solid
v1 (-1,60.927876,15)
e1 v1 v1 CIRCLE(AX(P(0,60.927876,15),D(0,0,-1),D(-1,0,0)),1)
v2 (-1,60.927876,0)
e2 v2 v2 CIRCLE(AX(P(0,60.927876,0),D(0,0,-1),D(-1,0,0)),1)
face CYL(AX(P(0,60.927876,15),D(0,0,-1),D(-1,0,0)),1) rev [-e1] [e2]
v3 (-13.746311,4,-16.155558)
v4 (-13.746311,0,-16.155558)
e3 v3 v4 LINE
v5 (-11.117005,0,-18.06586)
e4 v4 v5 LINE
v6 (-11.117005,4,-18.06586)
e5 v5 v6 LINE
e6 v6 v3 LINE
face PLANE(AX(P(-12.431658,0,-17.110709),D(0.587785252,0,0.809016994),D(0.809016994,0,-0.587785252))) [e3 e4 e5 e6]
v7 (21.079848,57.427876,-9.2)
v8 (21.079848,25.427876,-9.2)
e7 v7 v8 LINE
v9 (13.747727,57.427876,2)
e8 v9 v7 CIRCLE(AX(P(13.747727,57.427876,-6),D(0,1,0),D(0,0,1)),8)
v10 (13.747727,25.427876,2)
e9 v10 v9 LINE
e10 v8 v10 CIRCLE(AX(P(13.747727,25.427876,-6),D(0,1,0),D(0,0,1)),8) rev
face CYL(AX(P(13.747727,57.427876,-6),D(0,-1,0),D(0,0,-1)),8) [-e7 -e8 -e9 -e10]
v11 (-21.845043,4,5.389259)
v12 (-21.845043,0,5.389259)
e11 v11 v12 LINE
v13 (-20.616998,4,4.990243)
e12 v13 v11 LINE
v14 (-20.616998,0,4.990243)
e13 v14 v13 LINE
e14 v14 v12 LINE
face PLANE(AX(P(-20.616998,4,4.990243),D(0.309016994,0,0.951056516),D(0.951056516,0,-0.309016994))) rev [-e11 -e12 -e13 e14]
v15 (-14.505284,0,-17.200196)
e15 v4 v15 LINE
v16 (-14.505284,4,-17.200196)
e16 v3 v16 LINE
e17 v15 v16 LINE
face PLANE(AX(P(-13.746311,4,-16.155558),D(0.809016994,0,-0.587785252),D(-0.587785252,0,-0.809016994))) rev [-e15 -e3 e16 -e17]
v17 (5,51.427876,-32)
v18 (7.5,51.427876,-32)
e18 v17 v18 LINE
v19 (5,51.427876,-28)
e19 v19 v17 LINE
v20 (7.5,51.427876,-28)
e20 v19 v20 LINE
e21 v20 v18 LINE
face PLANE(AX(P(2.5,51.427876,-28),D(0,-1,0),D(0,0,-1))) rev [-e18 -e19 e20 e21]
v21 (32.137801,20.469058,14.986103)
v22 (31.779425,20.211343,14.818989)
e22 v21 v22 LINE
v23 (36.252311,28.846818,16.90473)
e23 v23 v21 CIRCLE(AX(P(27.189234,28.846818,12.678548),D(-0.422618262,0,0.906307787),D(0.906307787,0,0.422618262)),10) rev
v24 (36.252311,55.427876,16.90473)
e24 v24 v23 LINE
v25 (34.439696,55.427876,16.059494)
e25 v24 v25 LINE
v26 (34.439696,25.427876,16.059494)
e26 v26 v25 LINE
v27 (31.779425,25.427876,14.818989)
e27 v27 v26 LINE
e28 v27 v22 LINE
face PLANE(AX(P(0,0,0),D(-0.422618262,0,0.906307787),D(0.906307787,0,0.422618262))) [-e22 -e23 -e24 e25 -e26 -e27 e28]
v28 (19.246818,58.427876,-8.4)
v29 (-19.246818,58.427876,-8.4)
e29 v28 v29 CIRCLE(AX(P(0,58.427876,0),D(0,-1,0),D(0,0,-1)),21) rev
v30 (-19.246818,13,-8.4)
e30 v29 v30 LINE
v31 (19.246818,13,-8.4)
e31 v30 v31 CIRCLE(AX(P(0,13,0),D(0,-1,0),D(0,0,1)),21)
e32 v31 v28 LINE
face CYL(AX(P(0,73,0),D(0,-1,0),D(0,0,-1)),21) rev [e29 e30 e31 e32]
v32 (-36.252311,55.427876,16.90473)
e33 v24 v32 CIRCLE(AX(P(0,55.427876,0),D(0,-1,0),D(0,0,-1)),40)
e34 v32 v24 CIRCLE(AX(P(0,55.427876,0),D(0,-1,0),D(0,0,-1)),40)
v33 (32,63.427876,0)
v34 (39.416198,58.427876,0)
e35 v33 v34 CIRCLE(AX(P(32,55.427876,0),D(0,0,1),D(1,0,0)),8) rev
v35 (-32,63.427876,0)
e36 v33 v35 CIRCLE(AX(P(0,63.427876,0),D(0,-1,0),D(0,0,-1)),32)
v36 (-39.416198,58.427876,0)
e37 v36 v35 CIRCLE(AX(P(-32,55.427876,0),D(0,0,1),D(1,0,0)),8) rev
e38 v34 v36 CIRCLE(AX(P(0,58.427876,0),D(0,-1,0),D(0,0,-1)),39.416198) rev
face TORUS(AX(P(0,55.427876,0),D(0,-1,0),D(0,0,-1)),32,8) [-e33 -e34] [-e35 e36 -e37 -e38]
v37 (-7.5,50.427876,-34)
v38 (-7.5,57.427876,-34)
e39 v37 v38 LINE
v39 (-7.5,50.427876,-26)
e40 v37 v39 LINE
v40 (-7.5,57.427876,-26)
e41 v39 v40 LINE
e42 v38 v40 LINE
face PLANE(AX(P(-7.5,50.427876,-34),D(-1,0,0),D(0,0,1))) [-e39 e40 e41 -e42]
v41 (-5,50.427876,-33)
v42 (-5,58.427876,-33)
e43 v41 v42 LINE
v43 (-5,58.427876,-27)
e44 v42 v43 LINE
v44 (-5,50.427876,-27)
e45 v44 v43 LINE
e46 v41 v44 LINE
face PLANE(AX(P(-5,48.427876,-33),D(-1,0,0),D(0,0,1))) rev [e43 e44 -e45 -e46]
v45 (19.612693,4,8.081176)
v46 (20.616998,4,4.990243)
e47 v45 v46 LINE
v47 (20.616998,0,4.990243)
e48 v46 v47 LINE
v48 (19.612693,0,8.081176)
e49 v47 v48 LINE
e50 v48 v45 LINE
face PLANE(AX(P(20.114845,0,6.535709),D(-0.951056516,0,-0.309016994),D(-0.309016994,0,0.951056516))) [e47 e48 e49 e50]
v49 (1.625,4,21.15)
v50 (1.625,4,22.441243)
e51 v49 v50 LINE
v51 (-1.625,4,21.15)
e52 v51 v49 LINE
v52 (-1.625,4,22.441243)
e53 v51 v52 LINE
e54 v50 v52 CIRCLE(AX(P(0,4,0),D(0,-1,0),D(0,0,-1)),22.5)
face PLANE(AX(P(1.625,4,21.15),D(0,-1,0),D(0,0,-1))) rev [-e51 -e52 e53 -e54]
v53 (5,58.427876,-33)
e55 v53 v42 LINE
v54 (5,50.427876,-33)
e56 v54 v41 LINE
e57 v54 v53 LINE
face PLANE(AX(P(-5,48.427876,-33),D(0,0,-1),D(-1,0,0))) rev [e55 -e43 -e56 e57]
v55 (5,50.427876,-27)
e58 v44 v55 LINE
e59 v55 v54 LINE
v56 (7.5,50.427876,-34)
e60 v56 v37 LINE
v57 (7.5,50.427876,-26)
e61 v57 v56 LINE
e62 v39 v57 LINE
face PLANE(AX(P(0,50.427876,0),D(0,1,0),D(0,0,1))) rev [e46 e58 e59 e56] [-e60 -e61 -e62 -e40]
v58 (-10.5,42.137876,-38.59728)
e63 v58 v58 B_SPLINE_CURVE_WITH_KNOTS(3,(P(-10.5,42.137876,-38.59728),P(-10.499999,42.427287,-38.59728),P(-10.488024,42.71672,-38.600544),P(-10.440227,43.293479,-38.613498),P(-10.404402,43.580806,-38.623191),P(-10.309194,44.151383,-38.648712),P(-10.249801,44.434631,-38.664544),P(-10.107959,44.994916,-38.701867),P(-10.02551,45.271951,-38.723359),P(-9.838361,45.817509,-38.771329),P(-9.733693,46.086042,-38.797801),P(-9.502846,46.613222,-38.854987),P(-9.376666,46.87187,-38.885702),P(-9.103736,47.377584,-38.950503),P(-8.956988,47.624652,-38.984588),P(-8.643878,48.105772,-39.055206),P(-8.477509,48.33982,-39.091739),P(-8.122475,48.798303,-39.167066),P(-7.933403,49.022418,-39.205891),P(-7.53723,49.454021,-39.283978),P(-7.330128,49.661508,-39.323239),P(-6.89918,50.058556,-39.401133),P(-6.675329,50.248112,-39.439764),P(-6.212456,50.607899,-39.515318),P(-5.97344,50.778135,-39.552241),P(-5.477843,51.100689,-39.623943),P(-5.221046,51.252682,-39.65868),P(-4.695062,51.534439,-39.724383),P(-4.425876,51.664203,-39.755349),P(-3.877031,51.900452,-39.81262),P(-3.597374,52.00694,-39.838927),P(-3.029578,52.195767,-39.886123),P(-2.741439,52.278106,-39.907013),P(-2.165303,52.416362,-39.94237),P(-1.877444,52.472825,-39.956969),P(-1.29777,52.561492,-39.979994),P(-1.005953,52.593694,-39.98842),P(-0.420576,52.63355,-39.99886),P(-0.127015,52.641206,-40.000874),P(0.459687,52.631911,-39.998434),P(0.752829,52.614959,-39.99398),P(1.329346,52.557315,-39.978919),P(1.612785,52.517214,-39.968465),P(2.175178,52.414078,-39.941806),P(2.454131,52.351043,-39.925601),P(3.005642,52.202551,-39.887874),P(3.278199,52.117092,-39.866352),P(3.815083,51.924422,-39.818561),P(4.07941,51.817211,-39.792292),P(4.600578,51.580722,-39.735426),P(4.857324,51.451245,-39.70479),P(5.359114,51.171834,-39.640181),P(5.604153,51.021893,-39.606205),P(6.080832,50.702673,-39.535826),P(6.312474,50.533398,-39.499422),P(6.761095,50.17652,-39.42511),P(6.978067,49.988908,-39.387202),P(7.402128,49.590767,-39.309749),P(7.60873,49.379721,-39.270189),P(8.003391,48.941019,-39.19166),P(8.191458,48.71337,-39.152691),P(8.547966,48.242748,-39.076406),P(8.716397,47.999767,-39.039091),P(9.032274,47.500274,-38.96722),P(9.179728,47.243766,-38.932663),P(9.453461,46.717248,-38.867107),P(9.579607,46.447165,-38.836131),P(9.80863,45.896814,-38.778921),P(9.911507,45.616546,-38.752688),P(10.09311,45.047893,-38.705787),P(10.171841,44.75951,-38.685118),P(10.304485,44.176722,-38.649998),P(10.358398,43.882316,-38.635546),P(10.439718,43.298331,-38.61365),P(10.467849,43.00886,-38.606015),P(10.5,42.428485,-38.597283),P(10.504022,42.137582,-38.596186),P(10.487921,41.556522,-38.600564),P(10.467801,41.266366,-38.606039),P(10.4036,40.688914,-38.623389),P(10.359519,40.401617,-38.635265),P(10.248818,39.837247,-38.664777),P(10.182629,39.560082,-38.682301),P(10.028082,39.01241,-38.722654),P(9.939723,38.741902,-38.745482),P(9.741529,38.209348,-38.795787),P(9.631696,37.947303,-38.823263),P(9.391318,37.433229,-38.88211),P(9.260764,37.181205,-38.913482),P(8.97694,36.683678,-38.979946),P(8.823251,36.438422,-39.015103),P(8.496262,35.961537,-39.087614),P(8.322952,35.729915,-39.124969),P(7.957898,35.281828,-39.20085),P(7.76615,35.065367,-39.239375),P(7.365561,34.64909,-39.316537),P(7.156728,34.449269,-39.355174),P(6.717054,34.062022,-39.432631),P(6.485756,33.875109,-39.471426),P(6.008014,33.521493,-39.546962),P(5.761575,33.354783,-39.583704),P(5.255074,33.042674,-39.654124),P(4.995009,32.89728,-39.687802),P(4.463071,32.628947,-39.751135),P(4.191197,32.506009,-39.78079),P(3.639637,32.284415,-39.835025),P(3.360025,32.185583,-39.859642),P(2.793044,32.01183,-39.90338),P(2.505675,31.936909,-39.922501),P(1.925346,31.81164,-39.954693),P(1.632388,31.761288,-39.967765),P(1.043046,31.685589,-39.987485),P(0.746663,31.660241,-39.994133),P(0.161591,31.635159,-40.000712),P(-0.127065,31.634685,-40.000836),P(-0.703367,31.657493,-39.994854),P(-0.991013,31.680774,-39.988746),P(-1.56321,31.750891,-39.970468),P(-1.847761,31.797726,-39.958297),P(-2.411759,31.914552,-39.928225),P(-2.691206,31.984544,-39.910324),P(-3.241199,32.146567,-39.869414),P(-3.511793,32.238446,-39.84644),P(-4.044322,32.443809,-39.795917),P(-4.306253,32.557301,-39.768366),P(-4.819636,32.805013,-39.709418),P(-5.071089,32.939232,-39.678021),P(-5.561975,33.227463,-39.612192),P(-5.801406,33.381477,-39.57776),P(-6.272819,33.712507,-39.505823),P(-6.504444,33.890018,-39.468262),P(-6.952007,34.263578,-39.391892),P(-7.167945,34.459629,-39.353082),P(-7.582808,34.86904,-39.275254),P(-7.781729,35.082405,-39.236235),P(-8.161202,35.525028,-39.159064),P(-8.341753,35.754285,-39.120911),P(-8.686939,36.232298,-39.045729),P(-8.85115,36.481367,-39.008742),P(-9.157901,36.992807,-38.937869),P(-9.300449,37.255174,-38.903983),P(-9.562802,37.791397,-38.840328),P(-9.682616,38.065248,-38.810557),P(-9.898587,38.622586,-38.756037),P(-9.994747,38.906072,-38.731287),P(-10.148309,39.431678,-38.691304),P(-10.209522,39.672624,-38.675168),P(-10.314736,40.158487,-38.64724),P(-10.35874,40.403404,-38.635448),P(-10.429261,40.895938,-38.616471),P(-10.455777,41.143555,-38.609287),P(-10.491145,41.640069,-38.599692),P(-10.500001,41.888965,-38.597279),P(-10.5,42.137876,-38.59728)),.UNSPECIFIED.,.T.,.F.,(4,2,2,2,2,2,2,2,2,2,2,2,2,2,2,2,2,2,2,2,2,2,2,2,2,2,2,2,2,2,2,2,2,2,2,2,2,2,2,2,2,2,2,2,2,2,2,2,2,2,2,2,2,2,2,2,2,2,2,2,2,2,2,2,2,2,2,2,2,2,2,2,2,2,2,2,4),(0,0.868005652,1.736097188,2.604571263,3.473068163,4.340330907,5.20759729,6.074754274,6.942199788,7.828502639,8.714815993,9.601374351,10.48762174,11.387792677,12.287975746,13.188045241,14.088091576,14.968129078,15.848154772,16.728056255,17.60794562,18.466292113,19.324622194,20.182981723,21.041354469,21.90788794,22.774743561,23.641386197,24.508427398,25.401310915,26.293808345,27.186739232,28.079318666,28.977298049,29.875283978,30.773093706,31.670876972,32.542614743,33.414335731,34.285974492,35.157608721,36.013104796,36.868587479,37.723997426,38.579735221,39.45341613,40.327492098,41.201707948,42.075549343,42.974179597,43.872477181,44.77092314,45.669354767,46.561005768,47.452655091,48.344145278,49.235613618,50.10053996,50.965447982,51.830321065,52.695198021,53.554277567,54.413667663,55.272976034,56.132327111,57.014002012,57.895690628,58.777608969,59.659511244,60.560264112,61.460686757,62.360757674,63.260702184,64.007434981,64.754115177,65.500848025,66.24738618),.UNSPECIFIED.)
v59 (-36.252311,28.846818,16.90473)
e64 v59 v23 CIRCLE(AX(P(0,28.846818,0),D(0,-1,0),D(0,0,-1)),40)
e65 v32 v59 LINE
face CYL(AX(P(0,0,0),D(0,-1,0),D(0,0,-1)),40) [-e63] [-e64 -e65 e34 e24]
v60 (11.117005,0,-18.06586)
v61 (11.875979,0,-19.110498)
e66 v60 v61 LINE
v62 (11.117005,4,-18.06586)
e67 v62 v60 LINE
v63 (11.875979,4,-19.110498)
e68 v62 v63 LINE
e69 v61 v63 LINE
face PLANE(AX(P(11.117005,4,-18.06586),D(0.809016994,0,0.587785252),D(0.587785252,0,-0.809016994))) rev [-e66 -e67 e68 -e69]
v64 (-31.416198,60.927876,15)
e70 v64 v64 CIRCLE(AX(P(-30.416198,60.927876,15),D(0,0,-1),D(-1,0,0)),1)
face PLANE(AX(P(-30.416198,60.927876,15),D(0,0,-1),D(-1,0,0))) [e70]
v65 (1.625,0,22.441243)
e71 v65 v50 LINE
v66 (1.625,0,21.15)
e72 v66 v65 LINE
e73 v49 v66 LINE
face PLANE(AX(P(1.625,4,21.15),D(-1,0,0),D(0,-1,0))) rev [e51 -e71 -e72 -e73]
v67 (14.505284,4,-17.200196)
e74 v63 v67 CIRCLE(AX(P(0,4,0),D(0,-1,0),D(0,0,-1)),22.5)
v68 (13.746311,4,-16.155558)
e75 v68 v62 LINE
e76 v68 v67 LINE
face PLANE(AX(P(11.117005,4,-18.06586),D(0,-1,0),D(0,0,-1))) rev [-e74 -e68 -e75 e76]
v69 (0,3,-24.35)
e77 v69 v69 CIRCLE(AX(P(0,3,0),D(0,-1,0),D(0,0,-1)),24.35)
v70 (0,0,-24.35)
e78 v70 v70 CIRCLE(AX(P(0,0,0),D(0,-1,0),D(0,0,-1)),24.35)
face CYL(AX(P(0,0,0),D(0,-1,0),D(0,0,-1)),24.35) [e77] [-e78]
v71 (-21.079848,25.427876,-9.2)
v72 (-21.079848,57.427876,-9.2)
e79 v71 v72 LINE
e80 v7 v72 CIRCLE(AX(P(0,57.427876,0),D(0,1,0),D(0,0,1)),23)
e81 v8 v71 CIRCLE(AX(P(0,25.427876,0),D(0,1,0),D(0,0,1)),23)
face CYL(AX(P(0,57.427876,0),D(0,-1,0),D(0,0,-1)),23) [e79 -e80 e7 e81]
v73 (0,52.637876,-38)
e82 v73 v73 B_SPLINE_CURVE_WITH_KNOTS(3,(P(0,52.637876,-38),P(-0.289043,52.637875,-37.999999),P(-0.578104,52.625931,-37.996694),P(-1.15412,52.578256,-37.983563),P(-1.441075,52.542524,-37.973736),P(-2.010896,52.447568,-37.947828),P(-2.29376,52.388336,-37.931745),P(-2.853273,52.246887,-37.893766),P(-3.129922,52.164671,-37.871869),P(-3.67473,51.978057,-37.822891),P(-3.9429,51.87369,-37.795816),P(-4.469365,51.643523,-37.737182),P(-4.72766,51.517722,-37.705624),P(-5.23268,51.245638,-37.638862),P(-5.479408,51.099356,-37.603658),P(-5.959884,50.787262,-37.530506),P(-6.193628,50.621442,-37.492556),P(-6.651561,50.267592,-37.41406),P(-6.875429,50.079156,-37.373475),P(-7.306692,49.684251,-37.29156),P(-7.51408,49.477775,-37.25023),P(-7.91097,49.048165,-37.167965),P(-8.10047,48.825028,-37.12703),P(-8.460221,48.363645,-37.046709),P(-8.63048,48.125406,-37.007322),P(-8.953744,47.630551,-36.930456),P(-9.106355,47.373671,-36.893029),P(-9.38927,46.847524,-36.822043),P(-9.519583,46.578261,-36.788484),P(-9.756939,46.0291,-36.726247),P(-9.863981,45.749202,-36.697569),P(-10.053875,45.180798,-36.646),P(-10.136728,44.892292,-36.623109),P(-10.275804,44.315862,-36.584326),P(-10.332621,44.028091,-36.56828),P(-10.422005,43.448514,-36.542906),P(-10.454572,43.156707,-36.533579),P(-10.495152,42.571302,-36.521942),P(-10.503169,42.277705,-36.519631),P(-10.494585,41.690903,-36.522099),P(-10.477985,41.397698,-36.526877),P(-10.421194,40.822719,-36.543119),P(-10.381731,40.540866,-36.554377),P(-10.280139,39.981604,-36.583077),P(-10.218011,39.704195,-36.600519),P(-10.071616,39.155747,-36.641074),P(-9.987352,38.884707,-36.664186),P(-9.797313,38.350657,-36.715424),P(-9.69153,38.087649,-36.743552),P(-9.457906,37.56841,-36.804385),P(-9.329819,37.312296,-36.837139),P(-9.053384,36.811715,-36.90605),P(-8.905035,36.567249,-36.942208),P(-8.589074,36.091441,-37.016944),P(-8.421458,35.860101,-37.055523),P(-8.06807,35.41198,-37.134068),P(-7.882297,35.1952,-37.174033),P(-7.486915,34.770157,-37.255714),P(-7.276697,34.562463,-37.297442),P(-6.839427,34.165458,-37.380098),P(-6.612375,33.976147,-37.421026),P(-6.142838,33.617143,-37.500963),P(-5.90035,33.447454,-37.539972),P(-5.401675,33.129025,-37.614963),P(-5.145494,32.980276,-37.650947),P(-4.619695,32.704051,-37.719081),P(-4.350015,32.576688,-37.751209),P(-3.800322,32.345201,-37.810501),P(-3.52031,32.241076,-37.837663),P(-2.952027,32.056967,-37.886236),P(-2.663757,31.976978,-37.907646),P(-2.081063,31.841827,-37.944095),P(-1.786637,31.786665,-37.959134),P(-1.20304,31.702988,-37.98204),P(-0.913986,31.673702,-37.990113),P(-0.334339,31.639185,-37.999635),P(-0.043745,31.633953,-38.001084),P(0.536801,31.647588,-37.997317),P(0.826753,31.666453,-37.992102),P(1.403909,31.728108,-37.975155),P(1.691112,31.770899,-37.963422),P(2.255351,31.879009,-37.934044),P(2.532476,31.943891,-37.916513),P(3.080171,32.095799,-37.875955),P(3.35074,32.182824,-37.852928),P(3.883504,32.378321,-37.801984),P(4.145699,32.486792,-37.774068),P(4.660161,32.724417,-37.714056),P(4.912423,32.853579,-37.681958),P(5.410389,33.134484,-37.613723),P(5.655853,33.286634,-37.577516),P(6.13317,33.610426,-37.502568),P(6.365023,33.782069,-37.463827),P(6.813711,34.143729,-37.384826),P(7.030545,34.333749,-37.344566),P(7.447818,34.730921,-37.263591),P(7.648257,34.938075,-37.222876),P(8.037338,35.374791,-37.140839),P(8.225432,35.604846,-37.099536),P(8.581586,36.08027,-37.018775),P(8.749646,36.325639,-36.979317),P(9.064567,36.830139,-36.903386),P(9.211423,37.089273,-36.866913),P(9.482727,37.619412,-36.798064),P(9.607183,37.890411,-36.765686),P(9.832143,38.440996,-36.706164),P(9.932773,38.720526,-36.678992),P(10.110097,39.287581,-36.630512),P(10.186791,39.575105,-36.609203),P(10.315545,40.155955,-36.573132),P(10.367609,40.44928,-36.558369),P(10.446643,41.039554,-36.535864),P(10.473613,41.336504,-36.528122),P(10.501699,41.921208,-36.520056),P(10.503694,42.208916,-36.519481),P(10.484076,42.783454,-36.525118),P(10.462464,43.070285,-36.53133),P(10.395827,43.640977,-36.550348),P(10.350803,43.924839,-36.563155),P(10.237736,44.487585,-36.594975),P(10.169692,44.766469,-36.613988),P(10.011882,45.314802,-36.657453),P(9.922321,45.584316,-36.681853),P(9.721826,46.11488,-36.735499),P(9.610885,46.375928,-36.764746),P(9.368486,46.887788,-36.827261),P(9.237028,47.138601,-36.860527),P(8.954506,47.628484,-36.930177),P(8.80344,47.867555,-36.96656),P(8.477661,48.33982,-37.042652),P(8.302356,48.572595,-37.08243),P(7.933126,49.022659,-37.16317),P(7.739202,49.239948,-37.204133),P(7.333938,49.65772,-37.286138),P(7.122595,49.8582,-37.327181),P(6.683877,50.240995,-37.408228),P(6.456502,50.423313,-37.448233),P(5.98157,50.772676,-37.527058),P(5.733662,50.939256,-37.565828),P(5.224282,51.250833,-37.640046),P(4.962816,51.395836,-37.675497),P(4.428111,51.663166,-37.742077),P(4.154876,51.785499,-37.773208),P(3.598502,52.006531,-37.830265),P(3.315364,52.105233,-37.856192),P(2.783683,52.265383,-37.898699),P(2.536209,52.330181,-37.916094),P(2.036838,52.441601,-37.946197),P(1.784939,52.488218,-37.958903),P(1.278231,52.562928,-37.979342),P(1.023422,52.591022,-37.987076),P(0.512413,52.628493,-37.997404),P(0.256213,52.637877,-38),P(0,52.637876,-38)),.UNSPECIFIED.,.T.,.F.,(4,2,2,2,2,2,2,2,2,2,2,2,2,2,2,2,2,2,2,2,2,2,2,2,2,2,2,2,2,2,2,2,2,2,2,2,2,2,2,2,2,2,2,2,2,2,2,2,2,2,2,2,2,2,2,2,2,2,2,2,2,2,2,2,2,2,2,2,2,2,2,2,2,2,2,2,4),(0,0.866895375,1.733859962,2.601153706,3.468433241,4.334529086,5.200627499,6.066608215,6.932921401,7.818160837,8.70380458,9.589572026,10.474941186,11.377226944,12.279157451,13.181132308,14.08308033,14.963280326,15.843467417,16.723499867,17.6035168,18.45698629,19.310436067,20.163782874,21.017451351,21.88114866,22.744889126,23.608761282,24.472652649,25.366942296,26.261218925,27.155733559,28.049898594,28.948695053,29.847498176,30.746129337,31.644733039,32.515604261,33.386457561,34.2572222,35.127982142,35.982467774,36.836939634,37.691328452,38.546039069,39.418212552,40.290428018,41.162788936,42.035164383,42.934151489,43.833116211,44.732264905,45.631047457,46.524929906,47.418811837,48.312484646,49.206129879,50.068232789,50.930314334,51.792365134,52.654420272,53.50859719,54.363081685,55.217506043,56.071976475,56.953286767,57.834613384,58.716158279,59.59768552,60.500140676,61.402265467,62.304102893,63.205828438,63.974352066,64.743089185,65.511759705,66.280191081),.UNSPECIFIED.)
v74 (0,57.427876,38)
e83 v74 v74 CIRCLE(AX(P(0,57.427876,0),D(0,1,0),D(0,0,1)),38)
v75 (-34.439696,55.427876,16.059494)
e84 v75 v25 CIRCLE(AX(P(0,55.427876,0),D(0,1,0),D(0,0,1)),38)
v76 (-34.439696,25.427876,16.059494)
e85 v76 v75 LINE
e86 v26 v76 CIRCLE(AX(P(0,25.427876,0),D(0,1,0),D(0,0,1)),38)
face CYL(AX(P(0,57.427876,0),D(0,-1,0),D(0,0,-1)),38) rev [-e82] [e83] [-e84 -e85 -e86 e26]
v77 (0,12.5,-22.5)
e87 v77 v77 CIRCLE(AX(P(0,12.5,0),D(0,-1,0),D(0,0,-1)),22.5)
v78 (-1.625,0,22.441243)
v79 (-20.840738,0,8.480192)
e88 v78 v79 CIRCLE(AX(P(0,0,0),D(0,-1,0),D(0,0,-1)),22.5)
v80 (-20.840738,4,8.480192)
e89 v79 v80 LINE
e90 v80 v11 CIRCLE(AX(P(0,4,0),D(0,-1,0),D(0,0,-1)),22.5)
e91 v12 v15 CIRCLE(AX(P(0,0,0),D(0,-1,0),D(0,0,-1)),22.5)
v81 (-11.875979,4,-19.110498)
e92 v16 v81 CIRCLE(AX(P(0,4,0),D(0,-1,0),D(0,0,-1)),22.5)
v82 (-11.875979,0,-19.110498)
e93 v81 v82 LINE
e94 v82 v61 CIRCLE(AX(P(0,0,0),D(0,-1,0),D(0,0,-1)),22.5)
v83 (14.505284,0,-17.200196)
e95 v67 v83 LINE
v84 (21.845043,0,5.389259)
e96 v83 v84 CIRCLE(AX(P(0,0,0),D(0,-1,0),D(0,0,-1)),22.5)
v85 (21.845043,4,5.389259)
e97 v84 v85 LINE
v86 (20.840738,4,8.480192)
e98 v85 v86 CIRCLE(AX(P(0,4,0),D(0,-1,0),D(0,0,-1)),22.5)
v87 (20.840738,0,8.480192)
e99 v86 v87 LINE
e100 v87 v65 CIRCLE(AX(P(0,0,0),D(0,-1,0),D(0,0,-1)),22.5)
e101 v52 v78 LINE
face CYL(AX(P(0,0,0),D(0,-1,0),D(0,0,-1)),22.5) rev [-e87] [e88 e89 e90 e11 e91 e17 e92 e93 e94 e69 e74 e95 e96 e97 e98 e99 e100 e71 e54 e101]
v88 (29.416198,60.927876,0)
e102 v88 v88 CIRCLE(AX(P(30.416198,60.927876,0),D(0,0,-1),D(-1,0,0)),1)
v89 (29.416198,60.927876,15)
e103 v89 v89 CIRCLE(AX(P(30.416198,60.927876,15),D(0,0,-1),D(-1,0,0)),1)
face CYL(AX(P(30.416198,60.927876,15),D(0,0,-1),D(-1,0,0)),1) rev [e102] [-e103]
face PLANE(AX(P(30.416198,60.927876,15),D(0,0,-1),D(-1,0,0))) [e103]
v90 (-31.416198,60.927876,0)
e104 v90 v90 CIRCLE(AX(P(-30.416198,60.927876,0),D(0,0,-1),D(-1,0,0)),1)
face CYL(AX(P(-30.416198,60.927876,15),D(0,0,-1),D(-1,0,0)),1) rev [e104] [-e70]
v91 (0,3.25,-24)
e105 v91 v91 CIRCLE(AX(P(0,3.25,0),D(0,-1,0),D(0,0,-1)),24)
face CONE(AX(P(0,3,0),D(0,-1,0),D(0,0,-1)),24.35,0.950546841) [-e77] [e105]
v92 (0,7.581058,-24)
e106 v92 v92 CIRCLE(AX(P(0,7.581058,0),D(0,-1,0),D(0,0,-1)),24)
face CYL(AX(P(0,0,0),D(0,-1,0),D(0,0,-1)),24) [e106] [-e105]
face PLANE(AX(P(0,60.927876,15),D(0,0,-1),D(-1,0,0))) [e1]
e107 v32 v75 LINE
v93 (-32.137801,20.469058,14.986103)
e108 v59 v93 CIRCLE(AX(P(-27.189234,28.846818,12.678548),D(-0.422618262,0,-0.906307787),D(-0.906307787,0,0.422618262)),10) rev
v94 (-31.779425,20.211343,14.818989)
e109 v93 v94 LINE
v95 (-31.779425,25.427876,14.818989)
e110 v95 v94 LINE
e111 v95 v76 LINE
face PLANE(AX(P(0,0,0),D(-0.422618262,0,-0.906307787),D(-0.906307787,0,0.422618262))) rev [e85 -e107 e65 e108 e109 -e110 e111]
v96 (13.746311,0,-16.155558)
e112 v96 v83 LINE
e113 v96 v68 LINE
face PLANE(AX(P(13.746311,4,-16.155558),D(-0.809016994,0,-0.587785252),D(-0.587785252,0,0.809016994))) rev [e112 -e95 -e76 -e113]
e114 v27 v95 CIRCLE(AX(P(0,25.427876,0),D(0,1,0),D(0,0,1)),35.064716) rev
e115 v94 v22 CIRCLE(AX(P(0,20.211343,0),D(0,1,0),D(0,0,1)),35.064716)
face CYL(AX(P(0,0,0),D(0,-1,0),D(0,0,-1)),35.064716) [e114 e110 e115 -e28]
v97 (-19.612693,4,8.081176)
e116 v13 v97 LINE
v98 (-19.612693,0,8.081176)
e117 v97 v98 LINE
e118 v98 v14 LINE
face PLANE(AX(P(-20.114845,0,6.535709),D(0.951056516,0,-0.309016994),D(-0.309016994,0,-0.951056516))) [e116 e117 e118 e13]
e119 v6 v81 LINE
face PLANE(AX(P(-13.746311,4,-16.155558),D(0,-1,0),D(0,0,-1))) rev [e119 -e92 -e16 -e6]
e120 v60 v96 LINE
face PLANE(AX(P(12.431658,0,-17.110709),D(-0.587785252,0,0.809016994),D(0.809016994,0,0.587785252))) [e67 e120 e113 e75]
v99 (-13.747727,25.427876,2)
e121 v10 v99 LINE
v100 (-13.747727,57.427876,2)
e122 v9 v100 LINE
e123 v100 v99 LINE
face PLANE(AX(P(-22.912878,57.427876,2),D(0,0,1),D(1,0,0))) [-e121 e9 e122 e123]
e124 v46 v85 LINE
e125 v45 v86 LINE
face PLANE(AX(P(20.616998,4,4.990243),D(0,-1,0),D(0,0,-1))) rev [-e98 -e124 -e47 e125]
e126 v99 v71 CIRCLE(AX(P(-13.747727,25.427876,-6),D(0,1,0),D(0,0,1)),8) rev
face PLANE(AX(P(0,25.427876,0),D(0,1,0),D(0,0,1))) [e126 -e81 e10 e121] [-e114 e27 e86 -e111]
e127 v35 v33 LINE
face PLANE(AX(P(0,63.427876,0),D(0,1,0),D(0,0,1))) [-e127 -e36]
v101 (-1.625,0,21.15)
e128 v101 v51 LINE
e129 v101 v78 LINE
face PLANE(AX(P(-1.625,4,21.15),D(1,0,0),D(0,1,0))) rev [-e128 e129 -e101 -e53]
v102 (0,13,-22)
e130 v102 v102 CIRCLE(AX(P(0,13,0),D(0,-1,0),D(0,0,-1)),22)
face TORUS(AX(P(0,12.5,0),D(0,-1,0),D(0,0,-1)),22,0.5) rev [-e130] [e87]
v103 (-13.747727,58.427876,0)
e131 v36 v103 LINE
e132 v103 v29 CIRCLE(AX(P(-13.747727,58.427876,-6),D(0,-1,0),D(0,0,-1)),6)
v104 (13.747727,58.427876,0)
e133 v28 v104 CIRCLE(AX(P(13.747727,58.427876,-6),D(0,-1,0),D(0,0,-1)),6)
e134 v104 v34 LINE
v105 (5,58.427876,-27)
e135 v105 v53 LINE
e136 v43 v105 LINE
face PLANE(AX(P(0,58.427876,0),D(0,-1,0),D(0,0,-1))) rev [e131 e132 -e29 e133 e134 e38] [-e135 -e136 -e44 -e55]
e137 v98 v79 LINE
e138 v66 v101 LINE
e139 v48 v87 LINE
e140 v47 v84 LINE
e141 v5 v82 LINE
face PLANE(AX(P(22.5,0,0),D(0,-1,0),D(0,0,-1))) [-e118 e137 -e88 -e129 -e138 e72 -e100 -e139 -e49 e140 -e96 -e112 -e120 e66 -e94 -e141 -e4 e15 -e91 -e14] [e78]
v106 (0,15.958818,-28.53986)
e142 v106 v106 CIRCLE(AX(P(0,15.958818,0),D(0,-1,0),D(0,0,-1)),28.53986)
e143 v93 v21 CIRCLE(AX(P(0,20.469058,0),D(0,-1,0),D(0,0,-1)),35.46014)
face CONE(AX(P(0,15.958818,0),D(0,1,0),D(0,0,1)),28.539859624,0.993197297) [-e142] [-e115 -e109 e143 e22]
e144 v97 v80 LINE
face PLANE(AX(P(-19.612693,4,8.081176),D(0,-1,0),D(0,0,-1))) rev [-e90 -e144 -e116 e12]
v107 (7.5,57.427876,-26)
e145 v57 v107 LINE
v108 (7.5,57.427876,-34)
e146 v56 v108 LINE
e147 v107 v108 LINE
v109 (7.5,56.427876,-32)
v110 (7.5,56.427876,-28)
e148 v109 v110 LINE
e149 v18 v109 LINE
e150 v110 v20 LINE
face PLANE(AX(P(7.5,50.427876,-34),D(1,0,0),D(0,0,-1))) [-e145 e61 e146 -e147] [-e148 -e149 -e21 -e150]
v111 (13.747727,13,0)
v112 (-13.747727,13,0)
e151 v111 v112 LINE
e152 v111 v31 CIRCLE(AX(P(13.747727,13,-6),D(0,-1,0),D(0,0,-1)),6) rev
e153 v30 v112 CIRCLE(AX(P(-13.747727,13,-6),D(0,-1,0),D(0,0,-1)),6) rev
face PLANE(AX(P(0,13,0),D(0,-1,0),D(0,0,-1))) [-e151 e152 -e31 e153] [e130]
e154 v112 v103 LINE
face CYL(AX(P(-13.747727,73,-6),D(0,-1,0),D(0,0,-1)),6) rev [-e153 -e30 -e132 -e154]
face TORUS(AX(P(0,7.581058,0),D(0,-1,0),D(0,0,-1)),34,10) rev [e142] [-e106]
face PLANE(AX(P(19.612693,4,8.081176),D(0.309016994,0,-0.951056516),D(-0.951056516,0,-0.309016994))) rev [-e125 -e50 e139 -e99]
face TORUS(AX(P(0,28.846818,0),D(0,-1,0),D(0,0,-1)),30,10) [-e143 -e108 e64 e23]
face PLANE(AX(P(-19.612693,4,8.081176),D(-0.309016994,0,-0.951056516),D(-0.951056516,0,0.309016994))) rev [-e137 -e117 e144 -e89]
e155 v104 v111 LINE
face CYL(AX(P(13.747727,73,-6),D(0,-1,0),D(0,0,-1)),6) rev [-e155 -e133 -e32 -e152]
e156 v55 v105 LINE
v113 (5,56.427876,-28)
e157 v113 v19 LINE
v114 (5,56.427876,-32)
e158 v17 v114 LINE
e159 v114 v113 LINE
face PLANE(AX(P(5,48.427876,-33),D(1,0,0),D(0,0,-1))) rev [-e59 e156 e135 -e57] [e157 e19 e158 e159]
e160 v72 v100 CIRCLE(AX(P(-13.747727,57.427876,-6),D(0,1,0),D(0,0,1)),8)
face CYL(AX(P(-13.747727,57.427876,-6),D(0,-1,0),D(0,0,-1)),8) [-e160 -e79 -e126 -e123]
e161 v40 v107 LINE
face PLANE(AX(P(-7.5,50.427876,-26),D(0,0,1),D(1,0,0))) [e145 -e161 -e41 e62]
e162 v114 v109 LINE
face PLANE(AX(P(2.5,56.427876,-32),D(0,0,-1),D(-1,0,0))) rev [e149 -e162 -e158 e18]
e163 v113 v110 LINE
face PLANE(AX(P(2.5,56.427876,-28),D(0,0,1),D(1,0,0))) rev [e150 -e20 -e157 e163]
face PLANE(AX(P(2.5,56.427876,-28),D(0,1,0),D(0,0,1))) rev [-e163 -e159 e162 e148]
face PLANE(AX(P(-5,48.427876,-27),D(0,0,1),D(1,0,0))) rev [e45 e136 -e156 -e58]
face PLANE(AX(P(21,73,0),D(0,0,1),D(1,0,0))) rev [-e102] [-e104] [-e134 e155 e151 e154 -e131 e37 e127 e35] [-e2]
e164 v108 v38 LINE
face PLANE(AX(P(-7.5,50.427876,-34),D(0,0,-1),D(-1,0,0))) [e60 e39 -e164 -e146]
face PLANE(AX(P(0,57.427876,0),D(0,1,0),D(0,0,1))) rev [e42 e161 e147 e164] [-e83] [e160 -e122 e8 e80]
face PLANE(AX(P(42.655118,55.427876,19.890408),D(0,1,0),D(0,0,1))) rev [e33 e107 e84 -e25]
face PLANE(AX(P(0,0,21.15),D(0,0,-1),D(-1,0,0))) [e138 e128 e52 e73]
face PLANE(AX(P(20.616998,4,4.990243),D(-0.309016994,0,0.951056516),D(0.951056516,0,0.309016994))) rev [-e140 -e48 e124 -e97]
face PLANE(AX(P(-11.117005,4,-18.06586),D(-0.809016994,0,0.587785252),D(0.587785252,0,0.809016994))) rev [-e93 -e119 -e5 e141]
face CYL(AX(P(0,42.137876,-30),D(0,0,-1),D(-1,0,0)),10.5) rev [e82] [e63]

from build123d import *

# Parameters (mm, degrees)
CUT_EXTRUDE3_DEPTH           = 60
CUT_EXTRUDE5_DEPTH           = 2
CUT_EXTRUDE5_DEPTH_BACK      = 30
SKETCH9_R                    = 38
SKETCH9_R_2                  = 23
SKETCH19_W                   = 12
SKETCH19_H                   = 36.5
CUT_REVOLVE2_ANGLE           = 65
CUT_REVOLVE2_OTHER_WAY_ANGLE = 65
SKETCH21_W                   = 3.25
SKETCH21_H                   = 4
BOSS_EXTRUDE3_DEPTH          = 1.35
CIRPATTERN1_COUNT            = 5
CUT_EXTRUDE9_START           = -5
CUT_EXTRUDE9_DEPTH           = 5
SKETCH23_R                   = 10.5
CUT_EXTRUDE10_DEPTH          = 10
SKETCH24_W                   = 15
SKETCH24_H                   = 8
BOSS_EXTRUDE4_DEPTH          = 8
SKETCH26_W                   = 10
SKETCH26_H                   = 6
CUT_EXTRUDE11_DEPTH          = 10
SKETCH27_W                   = 4
SKETCH27_H                   = 5
CUT_EXTRUDE12_DEPTH          = 5
CUT_EXTRUDE14_DEPTH          = 2
CUT_EXTRUDE14_DEPTH_BACK     = 30
SKETCH29_R                   = 1
CUT_EXTRUDE15_DEPTH          = 15
FILLET1_R                    = 6
FILLET2_R                    = 8


with BuildPart() as part:
    # Sketch1 → Revolve1 (revolve)
    with BuildSketch(Plane.XY):
        with BuildLine():
            Line((0, 63.427876097), (32, 63.427876097))
            ThreePointArc((32, 63.427876097), (37.656854249, 61.084730346), (40, 55.427876097))
            Line((40, 55.427876097), (40, 28.846818009))
            ThreePointArc((40, 28.846818009), (38.792081772, 24.082439968), (35.460140376, 20.469057744))
            Line((35.460140376, 20.469057744), (28.539859624, 15.958818353))
            ThreePointArc((28.539859624, 15.958818353), (25.207918228, 12.345436129), (24, 7.581058088))
            Line((24, 7.581058088), (24, 3.25))
            Line((24, 3.25), (24.35, 3))
            Line((24.35, 3), (24.35, 0))
            Line((24.35, 0), (22.5, 0))
            Line((22.5, 0), (22.5, 12.5))
            ThreePointArc((22.5, 12.5), (22.353553391, 12.853553391), (22, 13))
            Line((22, 13), (0, 13))
            Line((0, 13), (0, 63.427876097))
        make_face()
    revolve(axis=Axis((0, 0, 0), (0, 1, 0)))

    # Sketch11 → Cut-Extrude3 (cut)
    with BuildSketch(Plane(origin=(0, 13, 0), x_dir=(-1, 0, 0), z_dir=(0, -1, 0))):
        with BuildLine():
            Line((-21, 0), (21, 0))
            ThreePointArc((21, 0), (0, 21), (-21, 0))
        make_face()
    extrude(amount=-CUT_EXTRUDE3_DEPTH, mode=Mode.SUBTRACT)

    # Sketch9 → Cut-Extrude5 (cut, two sides: drawn at the far end of the back side and taken through both)
    with BuildSketch(Plane(origin=(0, 55.427876097, 0), x_dir=(1, 0, 0), z_dir=(0, 1, 0)).offset(-CUT_EXTRUDE5_DEPTH_BACK)):
        Circle(SKETCH9_R)
        Circle(SKETCH9_R_2, mode=Mode.SUBTRACT)
    extrude(amount=CUT_EXTRUDE5_DEPTH + CUT_EXTRUDE5_DEPTH_BACK, mode=Mode.SUBTRACT)

    # Sketch19 → Cut-Revolve2 (revolve, cut)
    with BuildSketch(Plane(origin=(0, 0, 0), x_dir=(0, 0, -1), z_dir=(1, 0, 0))):
        with Locations((-41.064715832, 37.177876097)):
            Rectangle(SKETCH19_W, SKETCH19_H)
    revolve(axis=Axis((0, 0, 0), (0, 1, 0)), revolution_arc=CUT_REVOLVE2_ANGLE, mode=Mode.SUBTRACT)

    # Sketch19 → Cut-Revolve2 other way (revolve, cut)
    with BuildSketch(Plane(origin=(0, 0, 0), x_dir=(0, 0, -1), z_dir=(1, 0, 0))):
        with Locations((-41.064715832, 37.177876097)):
            Rectangle(SKETCH19_W, SKETCH19_H)
    revolve(axis=Axis((0, 0, 0), (0, -1, 0)), revolution_arc=CUT_REVOLVE2_OTHER_WAY_ANGLE, mode=Mode.SUBTRACT)

    # Sketch21 → Boss-Extrude3 (add)
    with BuildSketch(Plane(origin=(0, 0, 22.5), x_dir=(-1, 0, 0), z_dir=(0, 0, -1))):
        with Locations((0, 2)):
            Rectangle(SKETCH21_W, SKETCH21_H)
    boss_extrude3 = extrude(amount=BOSS_EXTRUDE3_DEPTH)

    # CirPattern1: Boss-Extrude3 ×5 about axis
    cirpattern1_axis = Axis((0, 0, 0), (0, -1, 0))
    for i in range(1, CIRPATTERN1_COUNT):
        add(boss_extrude3.rotate(cirpattern1_axis, i * 360 / CIRPATTERN1_COUNT))

    # Sketch22 → Cut-Extrude9 (cut)
    with BuildSketch(Plane(origin=(0, 63.427876097, 0), x_dir=(1, 0, 0), z_dir=(0, 1, 0)).offset(CUT_EXTRUDE9_START)):
        with BuildLine():
            Line((-40, 0), (40, 0))
            ThreePointArc((40, 0), (0, 40), (-40, 0))
        make_face()
    extrude(amount=CUT_EXTRUDE9_DEPTH, mode=Mode.SUBTRACT)

    # Sketch23 → Cut-Extrude10 (cut)
    with BuildSketch(Plane(origin=(0, 0, -40), x_dir=(-1, 0, 0), z_dir=(0, 0, -1))):
        with Locations((0, 42.137876097)):
            Circle(SKETCH23_R)
    extrude(amount=-CUT_EXTRUDE10_DEPTH, mode=Mode.SUBTRACT)

    # Sketch24 → Boss-Extrude4 (add)
    with BuildSketch(Plane(origin=(0, 58.427876097, 0), x_dir=(1, 0, 0), z_dir=(0, 1, 0))):
        with Locations((0, 30)):
            Rectangle(SKETCH24_W, SKETCH24_H)
    extrude(amount=-BOSS_EXTRUDE4_DEPTH)

    # Sketch26 → Cut-Extrude11 (cut)
    with BuildSketch(Plane(origin=(0, 58.427876097, 0), x_dir=(1, 0, 0), z_dir=(0, 1, 0))):
        with Locations((0, 30)):
            Rectangle(SKETCH26_W, SKETCH26_H)
    extrude(amount=-CUT_EXTRUDE11_DEPTH, mode=Mode.SUBTRACT)

    # Sketch27 → Cut-Extrude12 (cut)
    with BuildSketch(Plane(origin=(7.5, 0, 0), x_dir=(0, 0, -1), z_dir=(1, 0, 0))):
        with Locations((30, 53.927876097)):
            Rectangle(SKETCH27_W, SKETCH27_H)
    extrude(amount=-CUT_EXTRUDE12_DEPTH, mode=Mode.SUBTRACT)

    # Sketch28 → Cut-Extrude14 (cut, two sides: drawn at the far end of the back side and taken through both)
    with BuildSketch(Plane(origin=(0, 55.427876097, 0), x_dir=(1, 0, 0), z_dir=(0, 1, 0)).offset(-CUT_EXTRUDE14_DEPTH_BACK)):
        with BuildLine():
            Line((-22.912878475, -2), (22.912878475, -2))
            ThreePointArc((22.912878475, -2), (0, -23), (-22.912878475, -2))
        make_face()
    extrude(amount=CUT_EXTRUDE14_DEPTH + CUT_EXTRUDE14_DEPTH_BACK, mode=Mode.SUBTRACT)

    # Sketch29 → Cut-Extrude15 (cut)
    with BuildSketch(Plane(origin=(0, 0, 0), x_dir=(-1, 0, 0), z_dir=(0, 0, -1))):
        with Locations((-30.416198487, 60.927876097)):
            Circle(SKETCH29_R)
        with Locations((30.416198487, 60.927876097)):
            Circle(SKETCH29_R)
        with Locations((0, 60.927876097)):
            Circle(SKETCH29_R)
    extrude(amount=-CUT_EXTRUDE15_DEPTH, mode=Mode.SUBTRACT)

    # Fillet1
    fillet1_edges = [part.edges().sort_by_distance(p)[0] for p in [
        (-21, 35.713938048, 0),
        (21, 35.713938048, 0),
    ]]
    fillet(fillet1_edges, radius=FILLET1_R)

    # Fillet2
    fillet2_edges = [part.edges().sort_by_distance(p)[0] for p in [
        (22.912878475, 41.427876097, 2),
        (-22.912878475, 41.427876097, 2),
    ]]
    fillet(fillet2_edges, radius=FILLET2_R)


solid = part.part
